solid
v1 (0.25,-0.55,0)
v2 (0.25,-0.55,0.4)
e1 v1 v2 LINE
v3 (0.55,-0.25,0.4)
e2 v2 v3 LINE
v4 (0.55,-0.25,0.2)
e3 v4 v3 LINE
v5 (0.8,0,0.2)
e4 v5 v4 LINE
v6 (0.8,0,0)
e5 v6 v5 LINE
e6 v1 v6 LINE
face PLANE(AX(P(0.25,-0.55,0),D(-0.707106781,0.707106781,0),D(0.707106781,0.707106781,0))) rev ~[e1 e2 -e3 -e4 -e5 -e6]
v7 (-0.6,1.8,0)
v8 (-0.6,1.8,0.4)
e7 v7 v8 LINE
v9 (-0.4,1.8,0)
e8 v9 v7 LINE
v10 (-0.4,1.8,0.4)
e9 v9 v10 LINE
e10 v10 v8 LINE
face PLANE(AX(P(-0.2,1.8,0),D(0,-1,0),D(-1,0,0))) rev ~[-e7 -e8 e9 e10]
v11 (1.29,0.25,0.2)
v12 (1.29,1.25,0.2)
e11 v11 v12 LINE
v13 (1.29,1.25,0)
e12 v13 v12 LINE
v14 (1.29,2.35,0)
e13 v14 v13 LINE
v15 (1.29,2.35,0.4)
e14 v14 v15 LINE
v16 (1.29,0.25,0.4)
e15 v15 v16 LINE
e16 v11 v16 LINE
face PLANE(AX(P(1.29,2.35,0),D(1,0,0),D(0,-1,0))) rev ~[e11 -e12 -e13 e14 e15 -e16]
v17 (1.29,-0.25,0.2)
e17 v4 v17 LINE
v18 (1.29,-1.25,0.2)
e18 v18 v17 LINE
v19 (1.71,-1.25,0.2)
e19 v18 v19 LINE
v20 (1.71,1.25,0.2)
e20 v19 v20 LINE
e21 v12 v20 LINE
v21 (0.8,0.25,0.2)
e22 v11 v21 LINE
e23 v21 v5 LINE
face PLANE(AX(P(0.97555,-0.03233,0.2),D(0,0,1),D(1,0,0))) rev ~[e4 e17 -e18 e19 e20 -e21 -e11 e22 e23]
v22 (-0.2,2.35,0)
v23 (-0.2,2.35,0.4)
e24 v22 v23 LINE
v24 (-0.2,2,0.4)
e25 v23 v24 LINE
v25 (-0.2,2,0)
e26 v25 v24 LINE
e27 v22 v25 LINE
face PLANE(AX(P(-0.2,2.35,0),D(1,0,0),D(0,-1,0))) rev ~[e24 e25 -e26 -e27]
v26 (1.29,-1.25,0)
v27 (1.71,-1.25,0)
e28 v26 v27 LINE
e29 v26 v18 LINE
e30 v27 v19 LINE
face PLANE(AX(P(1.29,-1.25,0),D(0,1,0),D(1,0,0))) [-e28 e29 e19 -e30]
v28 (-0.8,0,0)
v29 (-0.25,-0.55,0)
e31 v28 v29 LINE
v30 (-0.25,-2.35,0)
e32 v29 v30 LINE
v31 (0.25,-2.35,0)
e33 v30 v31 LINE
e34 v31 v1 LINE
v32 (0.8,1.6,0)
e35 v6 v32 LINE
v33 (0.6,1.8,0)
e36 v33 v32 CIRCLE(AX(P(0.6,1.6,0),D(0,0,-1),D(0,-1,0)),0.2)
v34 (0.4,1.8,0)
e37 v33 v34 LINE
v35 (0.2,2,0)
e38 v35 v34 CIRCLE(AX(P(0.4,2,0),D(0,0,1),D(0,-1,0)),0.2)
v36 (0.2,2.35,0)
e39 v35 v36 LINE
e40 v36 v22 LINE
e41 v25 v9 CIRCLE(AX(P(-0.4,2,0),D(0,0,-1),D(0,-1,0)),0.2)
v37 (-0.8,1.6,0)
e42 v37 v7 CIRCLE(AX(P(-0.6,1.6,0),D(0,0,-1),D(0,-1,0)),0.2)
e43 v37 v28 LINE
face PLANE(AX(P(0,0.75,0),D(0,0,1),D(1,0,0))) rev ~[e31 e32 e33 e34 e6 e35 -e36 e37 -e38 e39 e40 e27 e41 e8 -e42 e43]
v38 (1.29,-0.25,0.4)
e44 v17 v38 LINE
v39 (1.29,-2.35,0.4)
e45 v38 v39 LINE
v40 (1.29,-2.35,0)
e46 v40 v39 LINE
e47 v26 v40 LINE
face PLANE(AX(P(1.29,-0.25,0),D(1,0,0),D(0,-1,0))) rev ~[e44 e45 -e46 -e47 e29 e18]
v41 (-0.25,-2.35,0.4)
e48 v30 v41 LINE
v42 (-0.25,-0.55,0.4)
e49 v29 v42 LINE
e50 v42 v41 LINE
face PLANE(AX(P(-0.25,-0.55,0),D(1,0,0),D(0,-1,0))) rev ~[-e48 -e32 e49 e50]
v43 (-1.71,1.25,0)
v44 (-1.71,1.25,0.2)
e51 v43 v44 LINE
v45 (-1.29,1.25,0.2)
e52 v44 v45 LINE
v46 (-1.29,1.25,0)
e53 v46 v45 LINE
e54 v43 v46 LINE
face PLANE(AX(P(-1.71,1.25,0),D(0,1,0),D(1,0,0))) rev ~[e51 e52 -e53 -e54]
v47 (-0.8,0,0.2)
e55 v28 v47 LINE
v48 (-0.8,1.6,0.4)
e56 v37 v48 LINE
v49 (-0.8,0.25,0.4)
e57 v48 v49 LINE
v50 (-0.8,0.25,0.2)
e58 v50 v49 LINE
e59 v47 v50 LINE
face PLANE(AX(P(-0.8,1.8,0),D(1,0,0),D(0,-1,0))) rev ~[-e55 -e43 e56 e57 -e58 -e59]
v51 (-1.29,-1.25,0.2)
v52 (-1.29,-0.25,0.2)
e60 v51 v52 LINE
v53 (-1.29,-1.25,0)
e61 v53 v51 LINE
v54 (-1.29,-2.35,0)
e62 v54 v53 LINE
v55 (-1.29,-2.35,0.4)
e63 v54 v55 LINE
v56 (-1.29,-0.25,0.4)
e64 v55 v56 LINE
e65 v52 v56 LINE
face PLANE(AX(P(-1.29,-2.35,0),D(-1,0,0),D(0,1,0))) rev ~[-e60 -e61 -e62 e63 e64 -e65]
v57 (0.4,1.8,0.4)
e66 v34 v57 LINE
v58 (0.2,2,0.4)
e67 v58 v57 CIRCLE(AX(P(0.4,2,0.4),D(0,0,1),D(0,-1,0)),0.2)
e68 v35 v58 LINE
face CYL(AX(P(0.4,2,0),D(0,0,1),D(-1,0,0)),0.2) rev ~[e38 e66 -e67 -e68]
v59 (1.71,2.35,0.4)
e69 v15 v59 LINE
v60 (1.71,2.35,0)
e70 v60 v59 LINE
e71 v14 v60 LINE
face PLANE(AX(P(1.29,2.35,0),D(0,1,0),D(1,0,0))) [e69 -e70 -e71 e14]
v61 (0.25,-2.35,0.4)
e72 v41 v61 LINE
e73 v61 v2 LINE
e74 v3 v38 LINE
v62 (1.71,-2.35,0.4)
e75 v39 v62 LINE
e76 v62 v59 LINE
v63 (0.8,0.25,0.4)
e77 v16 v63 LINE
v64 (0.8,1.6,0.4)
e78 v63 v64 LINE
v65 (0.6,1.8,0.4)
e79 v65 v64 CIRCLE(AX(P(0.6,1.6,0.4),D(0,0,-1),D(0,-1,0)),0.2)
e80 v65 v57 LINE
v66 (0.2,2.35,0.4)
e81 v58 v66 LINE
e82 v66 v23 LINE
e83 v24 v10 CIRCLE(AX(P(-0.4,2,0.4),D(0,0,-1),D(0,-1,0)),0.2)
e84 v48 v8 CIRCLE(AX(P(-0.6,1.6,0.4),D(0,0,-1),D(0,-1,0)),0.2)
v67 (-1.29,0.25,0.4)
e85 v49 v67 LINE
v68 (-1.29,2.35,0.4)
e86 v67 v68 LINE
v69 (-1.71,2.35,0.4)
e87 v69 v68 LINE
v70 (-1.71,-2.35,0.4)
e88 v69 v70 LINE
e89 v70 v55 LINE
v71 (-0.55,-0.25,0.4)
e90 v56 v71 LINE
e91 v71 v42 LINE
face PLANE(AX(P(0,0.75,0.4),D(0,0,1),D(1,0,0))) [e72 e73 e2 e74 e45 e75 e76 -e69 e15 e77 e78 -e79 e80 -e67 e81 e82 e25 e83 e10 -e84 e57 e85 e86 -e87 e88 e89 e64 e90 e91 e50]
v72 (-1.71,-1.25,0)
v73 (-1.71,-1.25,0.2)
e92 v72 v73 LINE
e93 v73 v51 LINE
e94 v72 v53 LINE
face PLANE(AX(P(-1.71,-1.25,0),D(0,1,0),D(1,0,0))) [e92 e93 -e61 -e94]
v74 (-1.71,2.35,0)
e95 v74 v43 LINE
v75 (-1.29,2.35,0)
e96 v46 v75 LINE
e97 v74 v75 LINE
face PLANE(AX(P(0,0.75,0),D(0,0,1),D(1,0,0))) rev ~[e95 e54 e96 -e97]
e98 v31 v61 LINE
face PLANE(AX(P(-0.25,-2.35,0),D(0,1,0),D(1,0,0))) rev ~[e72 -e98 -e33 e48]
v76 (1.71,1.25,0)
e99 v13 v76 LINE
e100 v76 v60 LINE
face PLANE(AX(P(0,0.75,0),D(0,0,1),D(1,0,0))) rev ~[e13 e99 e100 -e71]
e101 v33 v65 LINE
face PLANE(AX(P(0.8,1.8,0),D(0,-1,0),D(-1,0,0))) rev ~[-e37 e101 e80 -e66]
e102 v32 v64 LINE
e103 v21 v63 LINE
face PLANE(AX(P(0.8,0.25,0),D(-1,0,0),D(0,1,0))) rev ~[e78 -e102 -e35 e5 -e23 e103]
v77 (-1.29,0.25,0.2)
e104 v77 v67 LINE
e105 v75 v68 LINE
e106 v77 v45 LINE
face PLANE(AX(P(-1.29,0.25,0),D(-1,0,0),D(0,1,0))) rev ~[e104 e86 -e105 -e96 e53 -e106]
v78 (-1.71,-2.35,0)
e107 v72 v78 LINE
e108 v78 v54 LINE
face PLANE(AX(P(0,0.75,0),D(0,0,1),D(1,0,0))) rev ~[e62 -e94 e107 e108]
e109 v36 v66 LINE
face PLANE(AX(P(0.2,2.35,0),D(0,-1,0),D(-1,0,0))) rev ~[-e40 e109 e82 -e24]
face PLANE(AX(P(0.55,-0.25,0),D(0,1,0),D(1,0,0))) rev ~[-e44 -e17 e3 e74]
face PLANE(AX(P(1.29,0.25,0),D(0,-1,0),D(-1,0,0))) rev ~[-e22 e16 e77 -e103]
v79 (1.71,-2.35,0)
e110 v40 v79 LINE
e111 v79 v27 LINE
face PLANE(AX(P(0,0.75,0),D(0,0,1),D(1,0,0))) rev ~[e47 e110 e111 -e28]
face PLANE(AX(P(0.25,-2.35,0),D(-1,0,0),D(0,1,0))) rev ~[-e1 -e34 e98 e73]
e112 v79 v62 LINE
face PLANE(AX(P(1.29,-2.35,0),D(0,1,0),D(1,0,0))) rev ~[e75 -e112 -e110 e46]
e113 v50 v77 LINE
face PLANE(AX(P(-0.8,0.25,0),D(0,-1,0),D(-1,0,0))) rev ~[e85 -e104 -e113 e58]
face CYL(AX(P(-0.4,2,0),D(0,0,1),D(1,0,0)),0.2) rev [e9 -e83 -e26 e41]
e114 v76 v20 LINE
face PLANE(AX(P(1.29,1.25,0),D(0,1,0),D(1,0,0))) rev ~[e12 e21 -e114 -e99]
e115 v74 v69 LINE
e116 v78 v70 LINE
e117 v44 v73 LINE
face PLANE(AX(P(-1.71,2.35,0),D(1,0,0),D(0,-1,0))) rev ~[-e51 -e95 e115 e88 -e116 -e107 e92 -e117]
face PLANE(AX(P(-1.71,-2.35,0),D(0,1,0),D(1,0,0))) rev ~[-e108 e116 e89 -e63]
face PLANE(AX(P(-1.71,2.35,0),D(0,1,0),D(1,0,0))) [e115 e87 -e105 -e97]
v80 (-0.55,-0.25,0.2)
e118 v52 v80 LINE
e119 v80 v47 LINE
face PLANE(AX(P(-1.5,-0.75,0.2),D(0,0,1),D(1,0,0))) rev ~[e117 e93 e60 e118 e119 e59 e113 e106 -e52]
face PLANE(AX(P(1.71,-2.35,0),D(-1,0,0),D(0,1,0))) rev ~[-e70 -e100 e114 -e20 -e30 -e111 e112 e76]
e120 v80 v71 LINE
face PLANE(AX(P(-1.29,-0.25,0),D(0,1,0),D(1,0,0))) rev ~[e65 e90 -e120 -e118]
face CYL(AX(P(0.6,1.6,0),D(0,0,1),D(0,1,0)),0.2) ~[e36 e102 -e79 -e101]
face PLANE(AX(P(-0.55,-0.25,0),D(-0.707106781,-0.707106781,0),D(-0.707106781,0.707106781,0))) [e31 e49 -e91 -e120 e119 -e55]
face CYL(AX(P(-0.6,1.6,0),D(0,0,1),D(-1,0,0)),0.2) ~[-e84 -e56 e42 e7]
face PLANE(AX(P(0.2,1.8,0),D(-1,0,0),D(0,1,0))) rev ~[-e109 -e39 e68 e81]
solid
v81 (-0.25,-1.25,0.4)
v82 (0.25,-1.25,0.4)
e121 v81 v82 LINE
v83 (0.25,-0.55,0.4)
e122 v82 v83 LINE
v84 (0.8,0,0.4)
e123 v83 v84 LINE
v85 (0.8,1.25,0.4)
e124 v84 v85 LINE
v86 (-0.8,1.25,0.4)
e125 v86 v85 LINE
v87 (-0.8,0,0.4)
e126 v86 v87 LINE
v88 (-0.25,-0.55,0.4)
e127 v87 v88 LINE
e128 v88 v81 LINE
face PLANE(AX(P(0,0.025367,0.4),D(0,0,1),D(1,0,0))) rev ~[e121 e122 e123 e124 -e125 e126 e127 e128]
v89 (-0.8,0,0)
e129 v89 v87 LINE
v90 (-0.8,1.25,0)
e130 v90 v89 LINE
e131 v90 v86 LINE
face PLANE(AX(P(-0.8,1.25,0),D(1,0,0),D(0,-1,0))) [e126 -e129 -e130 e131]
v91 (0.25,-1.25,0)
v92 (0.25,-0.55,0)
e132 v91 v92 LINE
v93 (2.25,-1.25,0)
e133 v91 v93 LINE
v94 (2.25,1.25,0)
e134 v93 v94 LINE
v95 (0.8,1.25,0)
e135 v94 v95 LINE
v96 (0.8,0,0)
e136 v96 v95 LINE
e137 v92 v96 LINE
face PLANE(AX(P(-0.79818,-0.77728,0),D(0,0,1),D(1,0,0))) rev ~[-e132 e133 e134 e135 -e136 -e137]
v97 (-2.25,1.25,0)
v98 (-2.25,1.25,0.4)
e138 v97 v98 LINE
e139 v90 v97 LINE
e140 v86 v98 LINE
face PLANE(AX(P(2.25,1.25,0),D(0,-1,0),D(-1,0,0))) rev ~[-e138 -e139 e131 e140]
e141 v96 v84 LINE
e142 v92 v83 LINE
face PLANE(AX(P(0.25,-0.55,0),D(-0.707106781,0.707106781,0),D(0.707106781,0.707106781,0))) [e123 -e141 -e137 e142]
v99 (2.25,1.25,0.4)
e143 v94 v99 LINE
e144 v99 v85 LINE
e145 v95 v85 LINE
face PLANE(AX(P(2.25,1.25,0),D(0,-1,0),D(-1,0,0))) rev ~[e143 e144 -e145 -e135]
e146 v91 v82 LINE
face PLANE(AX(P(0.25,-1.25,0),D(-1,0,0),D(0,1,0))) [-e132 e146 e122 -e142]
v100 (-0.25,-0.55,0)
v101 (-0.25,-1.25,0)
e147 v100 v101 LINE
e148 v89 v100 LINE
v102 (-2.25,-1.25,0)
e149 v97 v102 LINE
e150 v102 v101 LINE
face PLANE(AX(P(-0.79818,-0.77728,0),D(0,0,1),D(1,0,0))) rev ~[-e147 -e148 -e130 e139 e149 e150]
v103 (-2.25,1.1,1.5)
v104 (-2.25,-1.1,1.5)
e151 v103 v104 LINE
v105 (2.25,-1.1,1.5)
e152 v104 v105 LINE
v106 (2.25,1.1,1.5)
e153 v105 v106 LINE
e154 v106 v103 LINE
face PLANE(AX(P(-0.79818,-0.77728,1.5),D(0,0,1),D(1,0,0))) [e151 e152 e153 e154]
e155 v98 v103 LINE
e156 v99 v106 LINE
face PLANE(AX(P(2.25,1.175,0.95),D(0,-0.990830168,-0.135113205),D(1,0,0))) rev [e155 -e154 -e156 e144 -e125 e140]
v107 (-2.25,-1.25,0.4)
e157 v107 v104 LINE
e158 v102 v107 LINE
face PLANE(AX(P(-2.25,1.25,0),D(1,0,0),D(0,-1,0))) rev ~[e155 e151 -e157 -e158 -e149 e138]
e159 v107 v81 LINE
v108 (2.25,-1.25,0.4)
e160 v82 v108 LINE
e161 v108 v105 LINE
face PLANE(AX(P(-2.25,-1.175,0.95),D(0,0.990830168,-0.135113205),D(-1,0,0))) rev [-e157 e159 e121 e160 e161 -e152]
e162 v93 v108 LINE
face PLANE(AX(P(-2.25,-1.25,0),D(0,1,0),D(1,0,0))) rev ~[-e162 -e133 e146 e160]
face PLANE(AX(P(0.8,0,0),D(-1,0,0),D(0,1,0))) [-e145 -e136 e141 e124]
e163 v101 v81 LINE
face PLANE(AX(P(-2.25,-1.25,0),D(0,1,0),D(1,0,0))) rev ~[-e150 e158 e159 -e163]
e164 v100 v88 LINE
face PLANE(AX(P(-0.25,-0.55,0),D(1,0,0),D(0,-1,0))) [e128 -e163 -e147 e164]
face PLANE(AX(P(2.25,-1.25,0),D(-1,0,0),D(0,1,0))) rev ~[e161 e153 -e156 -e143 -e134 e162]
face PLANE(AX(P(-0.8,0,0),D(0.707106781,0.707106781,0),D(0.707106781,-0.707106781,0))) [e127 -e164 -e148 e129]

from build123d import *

# Parameters (mm, degrees)
F4_W       = 1.6
F4_H       = 1
F4_W_2     = 0.42
F4_H_2     = 0.5
F4_H_3     = 1.1
F4_W_3     = 0.5
F5_DEPTH   = 0.4
F6_DEPTH   = 0.2
F7_R       = 0.2
F4_W_4     = 0.49
F8_DEPTH   = 1.5
F9_SIZE2   = 0.15
F9_SIZE    = 1.1
F9_2_SIZE2 = 0.15
F9_2_SIZE  = 1.1
F10_DEPTH  = 0.4


with BuildPart() as f5:
    # F4 (on Top) → F5 (new body)
    with BuildSketch(Plane.XY):
        with Locations((0, 0.75)):
            Rectangle(F4_W, F4_H)
        Polygon((-1.29, -0.25), (-0.55, -0.25), (-0.8, 0), (-0.8, 0.25), (-1.29, 0.25), align=None)
        Polygon((-0.55, -0.25), (0.55, -0.25), (0.8, 0), (0.8, 0.25), (-0.8, 0.25), (-0.8, 0), align=None)
        Polygon((-0.25, -1.25), (0.25, -1.25), (0.25, -0.55), (0.55, -0.25), (-0.55, -0.25), (-0.25, -0.55), align=None)
        with Locations((-1.5, 0)):
            Rectangle(F4_W_2, F4_H_2)
        with Locations((-1.5, 0.75)):
            Rectangle(F4_W_2, F4_H)
        with Locations((-1.5, -0.75)):
            Rectangle(F4_W_2, F4_H)
        with Locations((-1.5, -1.8)):
            Rectangle(F4_W_2, F4_H_3)
        with Locations((0, -1.8)):
            Rectangle(F4_W_3, F4_H_3)
        Polygon((0.55, -0.25), (1.29, -0.25), (1.29, 0.25), (0.8, 0.25), (0.8, 0), align=None)
        with Locations((1.5, -0.75)):
            Rectangle(F4_W_2, F4_H)
        with Locations((1.5, -1.8)):
            Rectangle(F4_W_2, F4_H_3)
        with Locations((1.5, 0)):
            Rectangle(F4_W_2, F4_H_2)
        with Locations((1.5, 0.75)):
            Rectangle(F4_W_2, F4_H)
        with Locations((1.5, 1.8)):
            Rectangle(F4_W_2, F4_H_3)
        Polygon((-0.8, 1.25), (0.8, 1.25), (0.8, 1.8), (0.2, 1.8), (0.2, 2.35), (-0.2, 2.35), (-0.2, 1.8), (-0.8, 1.8), align=None)
        with Locations((-1.5, 1.8)):
            Rectangle(F4_W_2, F4_H_3)
    extrude(amount=F5_DEPTH)

    # F4 (on Top) → F6 (cut)
    with BuildSketch(Plane.XY):
        with Locations((-1.5, -0.75)):
            Rectangle(F4_W_2, F4_H)
        with Locations((-1.5, 0)):
            Rectangle(F4_W_2, F4_H_2)
        with Locations((-1.5, 0.75)):
            Rectangle(F4_W_2, F4_H)
        Polygon((-1.29, -0.25), (-0.55, -0.25), (-0.8, 0), (-0.8, 0.25), (-1.29, 0.25), align=None)
        Polygon((0.55, -0.25), (1.29, -0.25), (1.29, 0.25), (0.8, 0.25), (0.8, 0), align=None)
        with Locations((1.5, -0.75)):
            Rectangle(F4_W_2, F4_H)
        with Locations((1.5, 0)):
            Rectangle(F4_W_2, F4_H_2)
        with Locations((1.5, 0.75)):
            Rectangle(F4_W_2, F4_H)
    extrude(amount=F6_DEPTH, mode=Mode.SUBTRACT)

    # F7
    f7_edges = [f5.edges().sort_by_distance(p)[0] for p in [
        (-0.8, 1.8, 0.2),
        (-0.2, 1.8, 0.2),
        (0.2, 1.8, 0.2),
        (0.8, 1.8, 0.2),
    ]]
    fillet(f7_edges, radius=F7_R)


with BuildPart() as f8:
    # F4 (on Top) → F8 (new body)
    with BuildSketch(Plane.XY):
        Polygon((-1.29, -1.25), (-0.25, -1.25), (-0.25, -0.55), (-0.55, -0.25), (-1.29, -0.25), align=None)
        with Locations((-1.5, -0.75)):
            Rectangle(F4_W_2, F4_H)
        with Locations((-1.5, 0)):
            Rectangle(F4_W_2, F4_H_2)
        with Locations((-1.5, 0.75)):
            Rectangle(F4_W_2, F4_H)
        with Locations((-1.045, 0.75)):
            Rectangle(F4_W_4, F4_H)
        with Locations((0, 0.75)):
            Rectangle(F4_W, F4_H)
        Polygon((-1.29, -0.25), (-0.55, -0.25), (-0.8, 0), (-0.8, 0.25), (-1.29, 0.25), align=None)
        Polygon((-0.25, -1.25), (0.25, -1.25), (0.25, -0.55), (0.55, -0.25), (-0.55, -0.25), (-0.25, -0.55), align=None)
        Polygon((-0.55, -0.25), (0.55, -0.25), (0.8, 0), (0.8, 0.25), (-0.8, 0.25), (-0.8, 0), align=None)
        Polygon((0.25, -1.25), (1.29, -1.25), (1.29, -0.25), (0.55, -0.25), (0.25, -0.55), align=None)
        with Locations((1.5, -0.75)):
            Rectangle(F4_W_2, F4_H)
        Polygon((0.55, -0.25), (1.29, -0.25), (1.29, 0.25), (0.8, 0.25), (0.8, 0), align=None)
        with Locations((1.5, 0)):
            Rectangle(F4_W_2, F4_H_2)
        Polygon((1.71, -1.25), (2.25, -1.25), (2.25, 1.25), (1.71, 1.25), (1.71, 0.25), (1.71, -0.25), align=None)
        with Locations((1.045, 0.75)):
            Rectangle(F4_W_4, F4_H)
        with Locations((1.5, 0.75)):
            Rectangle(F4_W_2, F4_H)
        Polygon((-2.25, -1.25), (-1.71, -1.25), (-1.71, -0.25), (-1.71, 0.25), (-1.71, 1.25), (-2.25, 1.25), align=None)
    extrude(amount=F8_DEPTH)

    # F9
    f9_edges = [f8.edges().sort_by_distance(p)[0] for p in [
        (0, -1.25, 1.5),
    ]]
    f9_side = f8.faces().sort_by_distance((0, -1.25, 0.75))[0]
    chamfer(f9_edges, length=F9_SIZE, length2=F9_SIZE2, reference=f9_side)

    # F9#2
    f9_2_edges = [f8.edges().sort_by_distance(p)[0] for p in [
        (0, 1.25, 1.5),
    ]]
    f9_2_side = f8.faces().sort_by_distance((0, 1.25, 0.75))[0]
    chamfer(f9_2_edges, length=F9_2_SIZE, length2=F9_2_SIZE2, reference=f9_2_side)

    # F4 (on Top) → F10 (cut)
    with BuildSketch(Plane.XY):
        Polygon((-0.55, -0.25), (0.55, -0.25), (0.8, 0), (0.8, 0.25), (-0.8, 0.25), (-0.8, 0), align=None)
        Polygon((-0.25, -1.25), (0.25, -1.25), (0.25, -0.55), (0.55, -0.25), (-0.55, -0.25), (-0.25, -0.55), align=None)
        with Locations((0, 0.75)):
            Rectangle(F4_W, F4_H)
    extrude(amount=F10_DEPTH, mode=Mode.SUBTRACT)


solid = Compound([f5.part, f8.part])
